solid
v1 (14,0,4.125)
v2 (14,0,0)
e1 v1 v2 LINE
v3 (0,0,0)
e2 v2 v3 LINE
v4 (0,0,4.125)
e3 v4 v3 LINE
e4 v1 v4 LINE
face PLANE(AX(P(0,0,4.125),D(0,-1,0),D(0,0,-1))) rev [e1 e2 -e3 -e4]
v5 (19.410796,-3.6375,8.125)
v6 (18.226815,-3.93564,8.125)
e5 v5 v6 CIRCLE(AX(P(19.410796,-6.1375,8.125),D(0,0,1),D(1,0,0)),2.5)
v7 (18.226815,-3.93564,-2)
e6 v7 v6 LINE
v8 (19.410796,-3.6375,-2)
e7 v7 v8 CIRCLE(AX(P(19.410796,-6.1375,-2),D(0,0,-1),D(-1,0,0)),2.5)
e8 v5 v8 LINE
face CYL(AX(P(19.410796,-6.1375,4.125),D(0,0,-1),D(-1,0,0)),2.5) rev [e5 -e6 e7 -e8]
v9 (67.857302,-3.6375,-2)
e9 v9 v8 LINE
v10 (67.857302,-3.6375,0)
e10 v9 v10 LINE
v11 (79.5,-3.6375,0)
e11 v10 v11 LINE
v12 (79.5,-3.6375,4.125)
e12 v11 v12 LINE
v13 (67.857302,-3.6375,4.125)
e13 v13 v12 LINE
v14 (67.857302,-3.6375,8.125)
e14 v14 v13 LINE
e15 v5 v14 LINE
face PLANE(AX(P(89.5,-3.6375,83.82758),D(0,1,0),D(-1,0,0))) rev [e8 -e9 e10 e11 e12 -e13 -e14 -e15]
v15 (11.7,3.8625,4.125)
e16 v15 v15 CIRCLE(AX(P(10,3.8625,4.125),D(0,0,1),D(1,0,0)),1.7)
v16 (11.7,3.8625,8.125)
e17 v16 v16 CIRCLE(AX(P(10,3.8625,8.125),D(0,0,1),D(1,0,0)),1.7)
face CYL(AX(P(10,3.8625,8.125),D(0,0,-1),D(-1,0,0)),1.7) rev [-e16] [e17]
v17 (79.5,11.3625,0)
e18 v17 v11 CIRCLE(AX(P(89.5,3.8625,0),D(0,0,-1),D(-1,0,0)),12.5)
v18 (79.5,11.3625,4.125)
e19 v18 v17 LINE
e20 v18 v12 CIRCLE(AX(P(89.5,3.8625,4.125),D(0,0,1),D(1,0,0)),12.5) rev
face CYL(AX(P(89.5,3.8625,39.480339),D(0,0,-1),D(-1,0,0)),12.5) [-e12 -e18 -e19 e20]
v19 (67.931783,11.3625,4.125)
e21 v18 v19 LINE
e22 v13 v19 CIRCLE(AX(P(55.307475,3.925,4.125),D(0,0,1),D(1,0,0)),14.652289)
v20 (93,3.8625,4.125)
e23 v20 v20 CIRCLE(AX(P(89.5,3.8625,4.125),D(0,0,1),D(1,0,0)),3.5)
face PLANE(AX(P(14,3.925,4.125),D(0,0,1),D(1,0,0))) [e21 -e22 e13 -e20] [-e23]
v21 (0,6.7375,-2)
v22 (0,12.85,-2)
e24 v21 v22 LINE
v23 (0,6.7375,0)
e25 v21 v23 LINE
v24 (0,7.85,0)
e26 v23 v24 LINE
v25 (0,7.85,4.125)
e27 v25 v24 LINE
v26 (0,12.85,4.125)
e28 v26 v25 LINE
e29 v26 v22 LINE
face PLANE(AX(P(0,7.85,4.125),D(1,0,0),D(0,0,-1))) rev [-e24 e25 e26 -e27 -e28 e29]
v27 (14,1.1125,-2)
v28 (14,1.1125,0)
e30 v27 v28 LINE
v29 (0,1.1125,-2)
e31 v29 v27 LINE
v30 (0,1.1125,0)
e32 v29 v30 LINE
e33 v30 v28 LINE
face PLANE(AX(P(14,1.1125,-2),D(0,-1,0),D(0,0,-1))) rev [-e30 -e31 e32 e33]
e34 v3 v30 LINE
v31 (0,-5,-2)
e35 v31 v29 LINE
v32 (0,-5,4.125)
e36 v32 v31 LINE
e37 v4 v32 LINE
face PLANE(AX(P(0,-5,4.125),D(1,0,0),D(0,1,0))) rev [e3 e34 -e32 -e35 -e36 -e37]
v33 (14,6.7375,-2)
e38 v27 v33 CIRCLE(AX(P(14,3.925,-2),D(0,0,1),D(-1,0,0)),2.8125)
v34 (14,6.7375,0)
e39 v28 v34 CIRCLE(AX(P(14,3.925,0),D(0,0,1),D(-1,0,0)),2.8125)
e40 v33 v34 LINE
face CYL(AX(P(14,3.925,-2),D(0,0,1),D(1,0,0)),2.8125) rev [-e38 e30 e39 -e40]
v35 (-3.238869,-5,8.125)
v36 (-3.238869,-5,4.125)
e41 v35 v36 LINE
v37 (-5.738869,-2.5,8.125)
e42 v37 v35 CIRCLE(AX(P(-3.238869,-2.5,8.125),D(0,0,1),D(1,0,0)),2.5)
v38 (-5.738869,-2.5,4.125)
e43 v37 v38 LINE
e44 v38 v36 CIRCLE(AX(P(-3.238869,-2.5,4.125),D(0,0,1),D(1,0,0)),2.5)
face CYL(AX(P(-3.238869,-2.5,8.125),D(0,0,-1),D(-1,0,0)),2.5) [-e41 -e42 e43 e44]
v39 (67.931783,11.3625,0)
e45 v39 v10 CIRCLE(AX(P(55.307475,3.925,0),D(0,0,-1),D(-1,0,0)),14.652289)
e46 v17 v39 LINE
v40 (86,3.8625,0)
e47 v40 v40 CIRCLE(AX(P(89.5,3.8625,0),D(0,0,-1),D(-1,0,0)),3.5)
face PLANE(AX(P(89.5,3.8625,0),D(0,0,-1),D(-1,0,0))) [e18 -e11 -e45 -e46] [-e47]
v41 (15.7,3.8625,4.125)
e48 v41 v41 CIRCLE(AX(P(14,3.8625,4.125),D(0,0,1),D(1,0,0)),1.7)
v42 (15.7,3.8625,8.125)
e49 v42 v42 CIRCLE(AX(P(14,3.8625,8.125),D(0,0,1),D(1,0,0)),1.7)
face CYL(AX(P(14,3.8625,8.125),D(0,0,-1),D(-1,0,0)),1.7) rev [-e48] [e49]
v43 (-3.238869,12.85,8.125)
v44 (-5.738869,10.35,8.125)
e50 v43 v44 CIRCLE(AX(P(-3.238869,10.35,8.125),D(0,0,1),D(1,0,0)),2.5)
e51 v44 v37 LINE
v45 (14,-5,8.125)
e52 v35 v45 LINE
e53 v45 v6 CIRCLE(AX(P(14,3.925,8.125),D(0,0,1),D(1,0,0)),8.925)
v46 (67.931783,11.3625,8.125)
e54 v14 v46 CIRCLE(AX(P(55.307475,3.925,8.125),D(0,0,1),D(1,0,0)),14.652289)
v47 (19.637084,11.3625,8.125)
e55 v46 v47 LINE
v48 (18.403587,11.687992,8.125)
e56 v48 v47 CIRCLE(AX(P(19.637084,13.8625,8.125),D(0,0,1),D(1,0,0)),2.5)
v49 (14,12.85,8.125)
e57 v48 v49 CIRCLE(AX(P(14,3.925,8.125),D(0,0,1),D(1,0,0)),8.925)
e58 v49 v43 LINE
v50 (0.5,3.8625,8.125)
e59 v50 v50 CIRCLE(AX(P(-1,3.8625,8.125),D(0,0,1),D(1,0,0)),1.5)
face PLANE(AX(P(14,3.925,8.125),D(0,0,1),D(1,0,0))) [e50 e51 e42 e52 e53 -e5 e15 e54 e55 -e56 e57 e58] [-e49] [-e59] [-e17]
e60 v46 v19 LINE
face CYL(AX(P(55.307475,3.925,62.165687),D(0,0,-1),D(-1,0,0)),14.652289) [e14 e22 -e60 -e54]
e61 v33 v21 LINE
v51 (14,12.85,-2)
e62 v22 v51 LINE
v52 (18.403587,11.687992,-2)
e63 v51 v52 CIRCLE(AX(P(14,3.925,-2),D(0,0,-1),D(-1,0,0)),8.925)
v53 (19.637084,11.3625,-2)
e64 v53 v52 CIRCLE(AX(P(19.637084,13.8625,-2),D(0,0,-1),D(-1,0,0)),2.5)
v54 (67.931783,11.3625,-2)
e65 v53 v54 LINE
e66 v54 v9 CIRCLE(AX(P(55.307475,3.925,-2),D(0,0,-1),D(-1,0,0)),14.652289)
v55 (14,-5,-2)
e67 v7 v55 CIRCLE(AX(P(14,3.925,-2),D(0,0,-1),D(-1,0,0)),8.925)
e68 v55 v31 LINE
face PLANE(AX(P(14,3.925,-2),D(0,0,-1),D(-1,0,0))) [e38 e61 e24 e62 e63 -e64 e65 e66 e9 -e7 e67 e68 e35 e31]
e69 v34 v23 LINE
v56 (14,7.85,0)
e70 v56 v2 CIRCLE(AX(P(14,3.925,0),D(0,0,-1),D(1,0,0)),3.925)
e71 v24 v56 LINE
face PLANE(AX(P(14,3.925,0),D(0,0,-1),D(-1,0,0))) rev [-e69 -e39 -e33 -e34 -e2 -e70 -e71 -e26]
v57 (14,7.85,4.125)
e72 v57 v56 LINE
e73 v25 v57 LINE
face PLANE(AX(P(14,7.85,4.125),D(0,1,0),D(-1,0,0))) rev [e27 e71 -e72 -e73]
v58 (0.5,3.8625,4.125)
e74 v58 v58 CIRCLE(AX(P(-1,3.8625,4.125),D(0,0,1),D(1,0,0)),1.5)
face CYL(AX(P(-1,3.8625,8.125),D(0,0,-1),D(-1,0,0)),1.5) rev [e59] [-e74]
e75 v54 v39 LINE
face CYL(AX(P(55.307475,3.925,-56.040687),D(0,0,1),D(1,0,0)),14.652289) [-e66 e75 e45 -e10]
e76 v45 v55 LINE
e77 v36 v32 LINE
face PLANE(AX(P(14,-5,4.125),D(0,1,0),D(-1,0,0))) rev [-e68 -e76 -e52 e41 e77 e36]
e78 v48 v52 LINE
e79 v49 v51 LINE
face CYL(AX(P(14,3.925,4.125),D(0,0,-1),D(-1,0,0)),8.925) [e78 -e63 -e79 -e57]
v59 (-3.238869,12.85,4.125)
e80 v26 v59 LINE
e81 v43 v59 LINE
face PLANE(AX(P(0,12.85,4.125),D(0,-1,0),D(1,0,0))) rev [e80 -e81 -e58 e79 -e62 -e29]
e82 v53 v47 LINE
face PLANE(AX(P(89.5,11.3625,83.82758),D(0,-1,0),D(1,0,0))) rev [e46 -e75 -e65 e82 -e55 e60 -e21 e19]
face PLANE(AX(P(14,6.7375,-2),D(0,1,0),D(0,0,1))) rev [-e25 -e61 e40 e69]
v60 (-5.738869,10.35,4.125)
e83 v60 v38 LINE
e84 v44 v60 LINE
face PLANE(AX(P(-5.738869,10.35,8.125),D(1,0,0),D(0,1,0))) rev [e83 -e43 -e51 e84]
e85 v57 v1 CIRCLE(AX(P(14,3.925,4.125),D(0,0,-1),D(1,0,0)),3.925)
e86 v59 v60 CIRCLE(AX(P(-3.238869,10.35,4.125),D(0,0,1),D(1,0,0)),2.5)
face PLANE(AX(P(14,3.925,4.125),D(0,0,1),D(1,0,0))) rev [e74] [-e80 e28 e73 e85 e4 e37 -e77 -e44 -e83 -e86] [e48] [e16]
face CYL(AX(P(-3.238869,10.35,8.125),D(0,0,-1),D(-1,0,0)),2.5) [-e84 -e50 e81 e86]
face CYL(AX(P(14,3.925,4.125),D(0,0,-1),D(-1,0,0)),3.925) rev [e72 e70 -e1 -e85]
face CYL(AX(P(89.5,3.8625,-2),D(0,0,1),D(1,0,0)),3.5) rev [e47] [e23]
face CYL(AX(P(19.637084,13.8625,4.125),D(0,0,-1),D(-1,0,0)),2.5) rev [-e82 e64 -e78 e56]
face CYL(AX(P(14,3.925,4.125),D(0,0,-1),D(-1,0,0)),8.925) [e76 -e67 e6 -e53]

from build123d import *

# Parameters (mm, degrees)
BOSS_EXTRUDE1_DEPTH  = 4.125
BOSS_EXTRUDE2_START  = 2
BOSS_EXTRUDE2_DEPTH  = 2
SKETCH3_R            = 1.7
SKETCH3_R_2          = 1.5
BOSS_EXTRUDE3_DEPTH  = 4
BOSS_EXTRUDE4_DEPTH  = 4.125
FILLET2_R            = 2.5
SKETCH9_R            = 3.5
CUT_EXTRUDE1_DEPTH   = 99.03896228
SKETCH10_R           = 12.5
SKETCH10_R_2         = 7.5
BOSS_EXTRUDE9_DEPTH  = 4.125
BOSS_EXTRUDE11_DEPTH = 2
BOSS_EXTRUDE12_DEPTH = 4


with BuildPart() as part:
    # Sketch1 → Boss-Extrude1 (new body)
    with BuildSketch(Plane.XY):
        with BuildLine():
            Line((0, 0), (14, 0))
            ThreePointArc((14, 0), (17.925, 3.925), (14, 7.85))
            Line((14, 7.85), (0, 7.85))
            Line((0, 7.85), (0, 12.85))
            Line((0, 12.85), (14, 12.85))
            ThreePointArc((14, 12.85), (22.925, 3.925), (14, -5))
            Line((14, -5), (0, -5))
            Line((0, -5), (0, 0))
        make_face()
    extrude(amount=BOSS_EXTRUDE1_DEPTH)

    # Sketch2 → Boss-Extrude2 (add)
    with BuildSketch(Plane(origin=(0, 0, 0), x_dir=(-1, 0, 0), z_dir=(0, 0, -1)).offset(BOSS_EXTRUDE2_START)):
        with BuildLine():
            Line((-14, 6.7375), (0, 6.7375))
            Line((0, 6.7375), (0, 7.85))
            Line((0, 7.85), (0, 12.85))
            Line((0, 12.85), (-14, 12.85))
            ThreePointArc((-14, 12.85), (-22.925, 3.925), (-14, -5))
            Line((-14, -5), (0, -5))
            Line((0, -5), (0, 0))
            Line((0, 0), (0, 1.1125))
            Line((0, 1.1125), (-14, 1.1125))
            ThreePointArc((-14, 1.1125), (-16.8125, 3.925), (-14, 6.7375))
        make_face()
    extrude(amount=-BOSS_EXTRUDE2_DEPTH)

    # Sketch3 → Boss-Extrude3 (add)
    with BuildSketch(Plane.XY.offset(4.125)):
        with BuildLine():
            Line((0, 12.85), (-3.238869072, 12.85))
            ThreePointArc((-3.238869072, 12.85), (-5.006636025, 12.117766953), (-5.738869072, 10.35))
            Line((-5.738869072, 10.35), (-5.738869072, -2.5))
            ThreePointArc((-5.738869072, -2.5), (-5.006636025, -4.267766953), (-3.238869072, -5))
            Line((-3.238869072, -5), (0, -5))
            Line((0, -5), (14, -5))
            ThreePointArc((14, -5), (18.764286268, -3.621999494), (22.057381748, 0.086481488))
            Line((22.057381748, 0.086481488), (22.057381748, 7.763518512))
            ThreePointArc((22.057381748, 7.763518512), (18.764286268, 11.471999494), (14, 12.85))
            Line((14, 12.85), (0, 12.85))
        make_face()
        with Locations((14, 3.8625)):
            Circle(SKETCH3_R, mode=Mode.SUBTRACT)
        with Locations((10, 3.8625)):
            Circle(SKETCH3_R, mode=Mode.SUBTRACT)
        with Locations((-1, 3.8625)):
            Circle(SKETCH3_R_2, mode=Mode.SUBTRACT)
    extrude(amount=BOSS_EXTRUDE3_DEPTH)

    # Sketch4 → Boss-Extrude4 (add)
    with BuildSketch(Plane.XY):
        with BuildLine():
            Line((89.5, 11.3625), (18.721642326, 11.3625))
            ThreePointArc((18.721642326, 11.3625), (22.8625, 3.8625), (18.721642326, -3.6375))
            Line((18.721642326, -3.6375), (89.5, -3.6375))
            ThreePointArc((89.5, -3.6375), (97, 3.8625), (89.5, 11.3625))
        make_face()
    extrude(amount=BOSS_EXTRUDE4_DEPTH)

    # Fillet2
    # the kernel refuses this fillet: 2.5 mm, written as the material it adds along each edge
    with BuildSketch(Plane(origin=(18.739643315, -3.6375, 4.125), x_dir=(1, 0, 0), z_dir=(0, 0, -1))) as fillet2_piece_1:
        with BuildLine():
            CenterArc((0.671153184, 2.5), FILLET2_R, 241.732240209, 28.267759791)
            ThreePointArc((-0.512828544, 0.298140044), (-0.253936624, 0.153331807), (0, 0))
            Line((0, 0), (0.671153184, 0))
        make_face()
    extrude(amount=4.125)
    with BuildSketch(Plane(origin=(18.933479376, 11.3625, 4.125), x_dir=(1, 0, 0), z_dir=(0, 0, -1))) as fillet2_piece_2:
        with BuildLine():
            CenterArc((0.703604866, -2.5), FILLET2_R, 90, 29.564237734)
            ThreePointArc((-0.52989278, -0.325492341), (-0.262110566, -0.167362816), (0, 0))
            Line((0, 0), (0.703604866, 0))
        make_face()
    extrude(amount=4.125)

    # Sketch9 → Cut-Extrude1 (cut, through all)
    with BuildSketch(Plane.XY.offset(4.125)):
        with Locations((89.5, 3.8625)):
            Circle(SKETCH9_R)
    extrude(amount=-CUT_EXTRUDE1_DEPTH, mode=Mode.SUBTRACT)

    # Sketch10 → Boss-Extrude9 (add)
    with BuildSketch(Plane(origin=(0, 0, 0), x_dir=(-1, 0, 0), z_dir=(0, 0, -1))):
        with Locations((-89.5, 3.8625)):
            Circle(SKETCH10_R)
        with Locations((-89.5, 3.8625)):
            Circle(SKETCH10_R_2, mode=Mode.SUBTRACT)
    extrude(amount=-BOSS_EXTRUDE9_DEPTH)

    # Sketch12 → Boss-Extrude11 (add)
    with BuildSketch(Plane(origin=(0, 0, 0), x_dir=(-1, 0, 0), z_dir=(0, 0, -1))):
        with BuildLine():
            Line((-19.637084242, 11.3625), (-67.931783013, 11.3625))
            ThreePointArc((-67.931783013, 11.3625), (-69.959582845, 3.85224622), (-67.857301806, -3.6375))
            Line((-67.857301806, -3.6375), (-19.410796499, -3.6375))
            ThreePointArc((-19.410796499, -3.6375), (-18.800325324, -3.713180519), (-18.22681477, -3.935640044))
            ThreePointArc((-18.22681477, -3.935640044), (-22.924428786, 3.824025558), (-18.403586596, 11.687992341))
            ThreePointArc((-18.403586596, 11.687992341), (-18.999224205, 11.445242344), (-19.637084242, 11.3625))
        make_face()
    extrude(amount=BOSS_EXTRUDE11_DEPTH)

    # Sketch13 → Boss-Extrude12 (add)
    with BuildSketch(Plane.XY.offset(4.125)):
        with BuildLine():
            Line((67.931783013, 11.3625), (19.637084242, 11.3625))
            ThreePointArc((19.637084242, 11.3625), (18.999224205, 11.445242344), (18.403586596, 11.687992341))
            ThreePointArc((18.403586596, 11.687992341), (20.532174732, 10.006637795), (22.057381748, 7.763518512))
            Line((22.057381748, 7.763518512), (22.057381748, 0.086481488))
            ThreePointArc((22.057381748, 0.086481488), (20.462951062, -2.230151385), (18.22681477, -3.935640044))
            ThreePointArc((18.22681477, -3.935640044), (18.800325324, -3.713180519), (19.410796499, -3.6375))
            Line((19.410796499, -3.6375), (67.857301806, -3.6375))
            ThreePointArc((67.857301806, -3.6375), (69.959582845, 3.85224622), (67.931783013, 11.3625))
        make_face()
    extrude(amount=BOSS_EXTRUDE12_DEPTH)


solid = part.part
